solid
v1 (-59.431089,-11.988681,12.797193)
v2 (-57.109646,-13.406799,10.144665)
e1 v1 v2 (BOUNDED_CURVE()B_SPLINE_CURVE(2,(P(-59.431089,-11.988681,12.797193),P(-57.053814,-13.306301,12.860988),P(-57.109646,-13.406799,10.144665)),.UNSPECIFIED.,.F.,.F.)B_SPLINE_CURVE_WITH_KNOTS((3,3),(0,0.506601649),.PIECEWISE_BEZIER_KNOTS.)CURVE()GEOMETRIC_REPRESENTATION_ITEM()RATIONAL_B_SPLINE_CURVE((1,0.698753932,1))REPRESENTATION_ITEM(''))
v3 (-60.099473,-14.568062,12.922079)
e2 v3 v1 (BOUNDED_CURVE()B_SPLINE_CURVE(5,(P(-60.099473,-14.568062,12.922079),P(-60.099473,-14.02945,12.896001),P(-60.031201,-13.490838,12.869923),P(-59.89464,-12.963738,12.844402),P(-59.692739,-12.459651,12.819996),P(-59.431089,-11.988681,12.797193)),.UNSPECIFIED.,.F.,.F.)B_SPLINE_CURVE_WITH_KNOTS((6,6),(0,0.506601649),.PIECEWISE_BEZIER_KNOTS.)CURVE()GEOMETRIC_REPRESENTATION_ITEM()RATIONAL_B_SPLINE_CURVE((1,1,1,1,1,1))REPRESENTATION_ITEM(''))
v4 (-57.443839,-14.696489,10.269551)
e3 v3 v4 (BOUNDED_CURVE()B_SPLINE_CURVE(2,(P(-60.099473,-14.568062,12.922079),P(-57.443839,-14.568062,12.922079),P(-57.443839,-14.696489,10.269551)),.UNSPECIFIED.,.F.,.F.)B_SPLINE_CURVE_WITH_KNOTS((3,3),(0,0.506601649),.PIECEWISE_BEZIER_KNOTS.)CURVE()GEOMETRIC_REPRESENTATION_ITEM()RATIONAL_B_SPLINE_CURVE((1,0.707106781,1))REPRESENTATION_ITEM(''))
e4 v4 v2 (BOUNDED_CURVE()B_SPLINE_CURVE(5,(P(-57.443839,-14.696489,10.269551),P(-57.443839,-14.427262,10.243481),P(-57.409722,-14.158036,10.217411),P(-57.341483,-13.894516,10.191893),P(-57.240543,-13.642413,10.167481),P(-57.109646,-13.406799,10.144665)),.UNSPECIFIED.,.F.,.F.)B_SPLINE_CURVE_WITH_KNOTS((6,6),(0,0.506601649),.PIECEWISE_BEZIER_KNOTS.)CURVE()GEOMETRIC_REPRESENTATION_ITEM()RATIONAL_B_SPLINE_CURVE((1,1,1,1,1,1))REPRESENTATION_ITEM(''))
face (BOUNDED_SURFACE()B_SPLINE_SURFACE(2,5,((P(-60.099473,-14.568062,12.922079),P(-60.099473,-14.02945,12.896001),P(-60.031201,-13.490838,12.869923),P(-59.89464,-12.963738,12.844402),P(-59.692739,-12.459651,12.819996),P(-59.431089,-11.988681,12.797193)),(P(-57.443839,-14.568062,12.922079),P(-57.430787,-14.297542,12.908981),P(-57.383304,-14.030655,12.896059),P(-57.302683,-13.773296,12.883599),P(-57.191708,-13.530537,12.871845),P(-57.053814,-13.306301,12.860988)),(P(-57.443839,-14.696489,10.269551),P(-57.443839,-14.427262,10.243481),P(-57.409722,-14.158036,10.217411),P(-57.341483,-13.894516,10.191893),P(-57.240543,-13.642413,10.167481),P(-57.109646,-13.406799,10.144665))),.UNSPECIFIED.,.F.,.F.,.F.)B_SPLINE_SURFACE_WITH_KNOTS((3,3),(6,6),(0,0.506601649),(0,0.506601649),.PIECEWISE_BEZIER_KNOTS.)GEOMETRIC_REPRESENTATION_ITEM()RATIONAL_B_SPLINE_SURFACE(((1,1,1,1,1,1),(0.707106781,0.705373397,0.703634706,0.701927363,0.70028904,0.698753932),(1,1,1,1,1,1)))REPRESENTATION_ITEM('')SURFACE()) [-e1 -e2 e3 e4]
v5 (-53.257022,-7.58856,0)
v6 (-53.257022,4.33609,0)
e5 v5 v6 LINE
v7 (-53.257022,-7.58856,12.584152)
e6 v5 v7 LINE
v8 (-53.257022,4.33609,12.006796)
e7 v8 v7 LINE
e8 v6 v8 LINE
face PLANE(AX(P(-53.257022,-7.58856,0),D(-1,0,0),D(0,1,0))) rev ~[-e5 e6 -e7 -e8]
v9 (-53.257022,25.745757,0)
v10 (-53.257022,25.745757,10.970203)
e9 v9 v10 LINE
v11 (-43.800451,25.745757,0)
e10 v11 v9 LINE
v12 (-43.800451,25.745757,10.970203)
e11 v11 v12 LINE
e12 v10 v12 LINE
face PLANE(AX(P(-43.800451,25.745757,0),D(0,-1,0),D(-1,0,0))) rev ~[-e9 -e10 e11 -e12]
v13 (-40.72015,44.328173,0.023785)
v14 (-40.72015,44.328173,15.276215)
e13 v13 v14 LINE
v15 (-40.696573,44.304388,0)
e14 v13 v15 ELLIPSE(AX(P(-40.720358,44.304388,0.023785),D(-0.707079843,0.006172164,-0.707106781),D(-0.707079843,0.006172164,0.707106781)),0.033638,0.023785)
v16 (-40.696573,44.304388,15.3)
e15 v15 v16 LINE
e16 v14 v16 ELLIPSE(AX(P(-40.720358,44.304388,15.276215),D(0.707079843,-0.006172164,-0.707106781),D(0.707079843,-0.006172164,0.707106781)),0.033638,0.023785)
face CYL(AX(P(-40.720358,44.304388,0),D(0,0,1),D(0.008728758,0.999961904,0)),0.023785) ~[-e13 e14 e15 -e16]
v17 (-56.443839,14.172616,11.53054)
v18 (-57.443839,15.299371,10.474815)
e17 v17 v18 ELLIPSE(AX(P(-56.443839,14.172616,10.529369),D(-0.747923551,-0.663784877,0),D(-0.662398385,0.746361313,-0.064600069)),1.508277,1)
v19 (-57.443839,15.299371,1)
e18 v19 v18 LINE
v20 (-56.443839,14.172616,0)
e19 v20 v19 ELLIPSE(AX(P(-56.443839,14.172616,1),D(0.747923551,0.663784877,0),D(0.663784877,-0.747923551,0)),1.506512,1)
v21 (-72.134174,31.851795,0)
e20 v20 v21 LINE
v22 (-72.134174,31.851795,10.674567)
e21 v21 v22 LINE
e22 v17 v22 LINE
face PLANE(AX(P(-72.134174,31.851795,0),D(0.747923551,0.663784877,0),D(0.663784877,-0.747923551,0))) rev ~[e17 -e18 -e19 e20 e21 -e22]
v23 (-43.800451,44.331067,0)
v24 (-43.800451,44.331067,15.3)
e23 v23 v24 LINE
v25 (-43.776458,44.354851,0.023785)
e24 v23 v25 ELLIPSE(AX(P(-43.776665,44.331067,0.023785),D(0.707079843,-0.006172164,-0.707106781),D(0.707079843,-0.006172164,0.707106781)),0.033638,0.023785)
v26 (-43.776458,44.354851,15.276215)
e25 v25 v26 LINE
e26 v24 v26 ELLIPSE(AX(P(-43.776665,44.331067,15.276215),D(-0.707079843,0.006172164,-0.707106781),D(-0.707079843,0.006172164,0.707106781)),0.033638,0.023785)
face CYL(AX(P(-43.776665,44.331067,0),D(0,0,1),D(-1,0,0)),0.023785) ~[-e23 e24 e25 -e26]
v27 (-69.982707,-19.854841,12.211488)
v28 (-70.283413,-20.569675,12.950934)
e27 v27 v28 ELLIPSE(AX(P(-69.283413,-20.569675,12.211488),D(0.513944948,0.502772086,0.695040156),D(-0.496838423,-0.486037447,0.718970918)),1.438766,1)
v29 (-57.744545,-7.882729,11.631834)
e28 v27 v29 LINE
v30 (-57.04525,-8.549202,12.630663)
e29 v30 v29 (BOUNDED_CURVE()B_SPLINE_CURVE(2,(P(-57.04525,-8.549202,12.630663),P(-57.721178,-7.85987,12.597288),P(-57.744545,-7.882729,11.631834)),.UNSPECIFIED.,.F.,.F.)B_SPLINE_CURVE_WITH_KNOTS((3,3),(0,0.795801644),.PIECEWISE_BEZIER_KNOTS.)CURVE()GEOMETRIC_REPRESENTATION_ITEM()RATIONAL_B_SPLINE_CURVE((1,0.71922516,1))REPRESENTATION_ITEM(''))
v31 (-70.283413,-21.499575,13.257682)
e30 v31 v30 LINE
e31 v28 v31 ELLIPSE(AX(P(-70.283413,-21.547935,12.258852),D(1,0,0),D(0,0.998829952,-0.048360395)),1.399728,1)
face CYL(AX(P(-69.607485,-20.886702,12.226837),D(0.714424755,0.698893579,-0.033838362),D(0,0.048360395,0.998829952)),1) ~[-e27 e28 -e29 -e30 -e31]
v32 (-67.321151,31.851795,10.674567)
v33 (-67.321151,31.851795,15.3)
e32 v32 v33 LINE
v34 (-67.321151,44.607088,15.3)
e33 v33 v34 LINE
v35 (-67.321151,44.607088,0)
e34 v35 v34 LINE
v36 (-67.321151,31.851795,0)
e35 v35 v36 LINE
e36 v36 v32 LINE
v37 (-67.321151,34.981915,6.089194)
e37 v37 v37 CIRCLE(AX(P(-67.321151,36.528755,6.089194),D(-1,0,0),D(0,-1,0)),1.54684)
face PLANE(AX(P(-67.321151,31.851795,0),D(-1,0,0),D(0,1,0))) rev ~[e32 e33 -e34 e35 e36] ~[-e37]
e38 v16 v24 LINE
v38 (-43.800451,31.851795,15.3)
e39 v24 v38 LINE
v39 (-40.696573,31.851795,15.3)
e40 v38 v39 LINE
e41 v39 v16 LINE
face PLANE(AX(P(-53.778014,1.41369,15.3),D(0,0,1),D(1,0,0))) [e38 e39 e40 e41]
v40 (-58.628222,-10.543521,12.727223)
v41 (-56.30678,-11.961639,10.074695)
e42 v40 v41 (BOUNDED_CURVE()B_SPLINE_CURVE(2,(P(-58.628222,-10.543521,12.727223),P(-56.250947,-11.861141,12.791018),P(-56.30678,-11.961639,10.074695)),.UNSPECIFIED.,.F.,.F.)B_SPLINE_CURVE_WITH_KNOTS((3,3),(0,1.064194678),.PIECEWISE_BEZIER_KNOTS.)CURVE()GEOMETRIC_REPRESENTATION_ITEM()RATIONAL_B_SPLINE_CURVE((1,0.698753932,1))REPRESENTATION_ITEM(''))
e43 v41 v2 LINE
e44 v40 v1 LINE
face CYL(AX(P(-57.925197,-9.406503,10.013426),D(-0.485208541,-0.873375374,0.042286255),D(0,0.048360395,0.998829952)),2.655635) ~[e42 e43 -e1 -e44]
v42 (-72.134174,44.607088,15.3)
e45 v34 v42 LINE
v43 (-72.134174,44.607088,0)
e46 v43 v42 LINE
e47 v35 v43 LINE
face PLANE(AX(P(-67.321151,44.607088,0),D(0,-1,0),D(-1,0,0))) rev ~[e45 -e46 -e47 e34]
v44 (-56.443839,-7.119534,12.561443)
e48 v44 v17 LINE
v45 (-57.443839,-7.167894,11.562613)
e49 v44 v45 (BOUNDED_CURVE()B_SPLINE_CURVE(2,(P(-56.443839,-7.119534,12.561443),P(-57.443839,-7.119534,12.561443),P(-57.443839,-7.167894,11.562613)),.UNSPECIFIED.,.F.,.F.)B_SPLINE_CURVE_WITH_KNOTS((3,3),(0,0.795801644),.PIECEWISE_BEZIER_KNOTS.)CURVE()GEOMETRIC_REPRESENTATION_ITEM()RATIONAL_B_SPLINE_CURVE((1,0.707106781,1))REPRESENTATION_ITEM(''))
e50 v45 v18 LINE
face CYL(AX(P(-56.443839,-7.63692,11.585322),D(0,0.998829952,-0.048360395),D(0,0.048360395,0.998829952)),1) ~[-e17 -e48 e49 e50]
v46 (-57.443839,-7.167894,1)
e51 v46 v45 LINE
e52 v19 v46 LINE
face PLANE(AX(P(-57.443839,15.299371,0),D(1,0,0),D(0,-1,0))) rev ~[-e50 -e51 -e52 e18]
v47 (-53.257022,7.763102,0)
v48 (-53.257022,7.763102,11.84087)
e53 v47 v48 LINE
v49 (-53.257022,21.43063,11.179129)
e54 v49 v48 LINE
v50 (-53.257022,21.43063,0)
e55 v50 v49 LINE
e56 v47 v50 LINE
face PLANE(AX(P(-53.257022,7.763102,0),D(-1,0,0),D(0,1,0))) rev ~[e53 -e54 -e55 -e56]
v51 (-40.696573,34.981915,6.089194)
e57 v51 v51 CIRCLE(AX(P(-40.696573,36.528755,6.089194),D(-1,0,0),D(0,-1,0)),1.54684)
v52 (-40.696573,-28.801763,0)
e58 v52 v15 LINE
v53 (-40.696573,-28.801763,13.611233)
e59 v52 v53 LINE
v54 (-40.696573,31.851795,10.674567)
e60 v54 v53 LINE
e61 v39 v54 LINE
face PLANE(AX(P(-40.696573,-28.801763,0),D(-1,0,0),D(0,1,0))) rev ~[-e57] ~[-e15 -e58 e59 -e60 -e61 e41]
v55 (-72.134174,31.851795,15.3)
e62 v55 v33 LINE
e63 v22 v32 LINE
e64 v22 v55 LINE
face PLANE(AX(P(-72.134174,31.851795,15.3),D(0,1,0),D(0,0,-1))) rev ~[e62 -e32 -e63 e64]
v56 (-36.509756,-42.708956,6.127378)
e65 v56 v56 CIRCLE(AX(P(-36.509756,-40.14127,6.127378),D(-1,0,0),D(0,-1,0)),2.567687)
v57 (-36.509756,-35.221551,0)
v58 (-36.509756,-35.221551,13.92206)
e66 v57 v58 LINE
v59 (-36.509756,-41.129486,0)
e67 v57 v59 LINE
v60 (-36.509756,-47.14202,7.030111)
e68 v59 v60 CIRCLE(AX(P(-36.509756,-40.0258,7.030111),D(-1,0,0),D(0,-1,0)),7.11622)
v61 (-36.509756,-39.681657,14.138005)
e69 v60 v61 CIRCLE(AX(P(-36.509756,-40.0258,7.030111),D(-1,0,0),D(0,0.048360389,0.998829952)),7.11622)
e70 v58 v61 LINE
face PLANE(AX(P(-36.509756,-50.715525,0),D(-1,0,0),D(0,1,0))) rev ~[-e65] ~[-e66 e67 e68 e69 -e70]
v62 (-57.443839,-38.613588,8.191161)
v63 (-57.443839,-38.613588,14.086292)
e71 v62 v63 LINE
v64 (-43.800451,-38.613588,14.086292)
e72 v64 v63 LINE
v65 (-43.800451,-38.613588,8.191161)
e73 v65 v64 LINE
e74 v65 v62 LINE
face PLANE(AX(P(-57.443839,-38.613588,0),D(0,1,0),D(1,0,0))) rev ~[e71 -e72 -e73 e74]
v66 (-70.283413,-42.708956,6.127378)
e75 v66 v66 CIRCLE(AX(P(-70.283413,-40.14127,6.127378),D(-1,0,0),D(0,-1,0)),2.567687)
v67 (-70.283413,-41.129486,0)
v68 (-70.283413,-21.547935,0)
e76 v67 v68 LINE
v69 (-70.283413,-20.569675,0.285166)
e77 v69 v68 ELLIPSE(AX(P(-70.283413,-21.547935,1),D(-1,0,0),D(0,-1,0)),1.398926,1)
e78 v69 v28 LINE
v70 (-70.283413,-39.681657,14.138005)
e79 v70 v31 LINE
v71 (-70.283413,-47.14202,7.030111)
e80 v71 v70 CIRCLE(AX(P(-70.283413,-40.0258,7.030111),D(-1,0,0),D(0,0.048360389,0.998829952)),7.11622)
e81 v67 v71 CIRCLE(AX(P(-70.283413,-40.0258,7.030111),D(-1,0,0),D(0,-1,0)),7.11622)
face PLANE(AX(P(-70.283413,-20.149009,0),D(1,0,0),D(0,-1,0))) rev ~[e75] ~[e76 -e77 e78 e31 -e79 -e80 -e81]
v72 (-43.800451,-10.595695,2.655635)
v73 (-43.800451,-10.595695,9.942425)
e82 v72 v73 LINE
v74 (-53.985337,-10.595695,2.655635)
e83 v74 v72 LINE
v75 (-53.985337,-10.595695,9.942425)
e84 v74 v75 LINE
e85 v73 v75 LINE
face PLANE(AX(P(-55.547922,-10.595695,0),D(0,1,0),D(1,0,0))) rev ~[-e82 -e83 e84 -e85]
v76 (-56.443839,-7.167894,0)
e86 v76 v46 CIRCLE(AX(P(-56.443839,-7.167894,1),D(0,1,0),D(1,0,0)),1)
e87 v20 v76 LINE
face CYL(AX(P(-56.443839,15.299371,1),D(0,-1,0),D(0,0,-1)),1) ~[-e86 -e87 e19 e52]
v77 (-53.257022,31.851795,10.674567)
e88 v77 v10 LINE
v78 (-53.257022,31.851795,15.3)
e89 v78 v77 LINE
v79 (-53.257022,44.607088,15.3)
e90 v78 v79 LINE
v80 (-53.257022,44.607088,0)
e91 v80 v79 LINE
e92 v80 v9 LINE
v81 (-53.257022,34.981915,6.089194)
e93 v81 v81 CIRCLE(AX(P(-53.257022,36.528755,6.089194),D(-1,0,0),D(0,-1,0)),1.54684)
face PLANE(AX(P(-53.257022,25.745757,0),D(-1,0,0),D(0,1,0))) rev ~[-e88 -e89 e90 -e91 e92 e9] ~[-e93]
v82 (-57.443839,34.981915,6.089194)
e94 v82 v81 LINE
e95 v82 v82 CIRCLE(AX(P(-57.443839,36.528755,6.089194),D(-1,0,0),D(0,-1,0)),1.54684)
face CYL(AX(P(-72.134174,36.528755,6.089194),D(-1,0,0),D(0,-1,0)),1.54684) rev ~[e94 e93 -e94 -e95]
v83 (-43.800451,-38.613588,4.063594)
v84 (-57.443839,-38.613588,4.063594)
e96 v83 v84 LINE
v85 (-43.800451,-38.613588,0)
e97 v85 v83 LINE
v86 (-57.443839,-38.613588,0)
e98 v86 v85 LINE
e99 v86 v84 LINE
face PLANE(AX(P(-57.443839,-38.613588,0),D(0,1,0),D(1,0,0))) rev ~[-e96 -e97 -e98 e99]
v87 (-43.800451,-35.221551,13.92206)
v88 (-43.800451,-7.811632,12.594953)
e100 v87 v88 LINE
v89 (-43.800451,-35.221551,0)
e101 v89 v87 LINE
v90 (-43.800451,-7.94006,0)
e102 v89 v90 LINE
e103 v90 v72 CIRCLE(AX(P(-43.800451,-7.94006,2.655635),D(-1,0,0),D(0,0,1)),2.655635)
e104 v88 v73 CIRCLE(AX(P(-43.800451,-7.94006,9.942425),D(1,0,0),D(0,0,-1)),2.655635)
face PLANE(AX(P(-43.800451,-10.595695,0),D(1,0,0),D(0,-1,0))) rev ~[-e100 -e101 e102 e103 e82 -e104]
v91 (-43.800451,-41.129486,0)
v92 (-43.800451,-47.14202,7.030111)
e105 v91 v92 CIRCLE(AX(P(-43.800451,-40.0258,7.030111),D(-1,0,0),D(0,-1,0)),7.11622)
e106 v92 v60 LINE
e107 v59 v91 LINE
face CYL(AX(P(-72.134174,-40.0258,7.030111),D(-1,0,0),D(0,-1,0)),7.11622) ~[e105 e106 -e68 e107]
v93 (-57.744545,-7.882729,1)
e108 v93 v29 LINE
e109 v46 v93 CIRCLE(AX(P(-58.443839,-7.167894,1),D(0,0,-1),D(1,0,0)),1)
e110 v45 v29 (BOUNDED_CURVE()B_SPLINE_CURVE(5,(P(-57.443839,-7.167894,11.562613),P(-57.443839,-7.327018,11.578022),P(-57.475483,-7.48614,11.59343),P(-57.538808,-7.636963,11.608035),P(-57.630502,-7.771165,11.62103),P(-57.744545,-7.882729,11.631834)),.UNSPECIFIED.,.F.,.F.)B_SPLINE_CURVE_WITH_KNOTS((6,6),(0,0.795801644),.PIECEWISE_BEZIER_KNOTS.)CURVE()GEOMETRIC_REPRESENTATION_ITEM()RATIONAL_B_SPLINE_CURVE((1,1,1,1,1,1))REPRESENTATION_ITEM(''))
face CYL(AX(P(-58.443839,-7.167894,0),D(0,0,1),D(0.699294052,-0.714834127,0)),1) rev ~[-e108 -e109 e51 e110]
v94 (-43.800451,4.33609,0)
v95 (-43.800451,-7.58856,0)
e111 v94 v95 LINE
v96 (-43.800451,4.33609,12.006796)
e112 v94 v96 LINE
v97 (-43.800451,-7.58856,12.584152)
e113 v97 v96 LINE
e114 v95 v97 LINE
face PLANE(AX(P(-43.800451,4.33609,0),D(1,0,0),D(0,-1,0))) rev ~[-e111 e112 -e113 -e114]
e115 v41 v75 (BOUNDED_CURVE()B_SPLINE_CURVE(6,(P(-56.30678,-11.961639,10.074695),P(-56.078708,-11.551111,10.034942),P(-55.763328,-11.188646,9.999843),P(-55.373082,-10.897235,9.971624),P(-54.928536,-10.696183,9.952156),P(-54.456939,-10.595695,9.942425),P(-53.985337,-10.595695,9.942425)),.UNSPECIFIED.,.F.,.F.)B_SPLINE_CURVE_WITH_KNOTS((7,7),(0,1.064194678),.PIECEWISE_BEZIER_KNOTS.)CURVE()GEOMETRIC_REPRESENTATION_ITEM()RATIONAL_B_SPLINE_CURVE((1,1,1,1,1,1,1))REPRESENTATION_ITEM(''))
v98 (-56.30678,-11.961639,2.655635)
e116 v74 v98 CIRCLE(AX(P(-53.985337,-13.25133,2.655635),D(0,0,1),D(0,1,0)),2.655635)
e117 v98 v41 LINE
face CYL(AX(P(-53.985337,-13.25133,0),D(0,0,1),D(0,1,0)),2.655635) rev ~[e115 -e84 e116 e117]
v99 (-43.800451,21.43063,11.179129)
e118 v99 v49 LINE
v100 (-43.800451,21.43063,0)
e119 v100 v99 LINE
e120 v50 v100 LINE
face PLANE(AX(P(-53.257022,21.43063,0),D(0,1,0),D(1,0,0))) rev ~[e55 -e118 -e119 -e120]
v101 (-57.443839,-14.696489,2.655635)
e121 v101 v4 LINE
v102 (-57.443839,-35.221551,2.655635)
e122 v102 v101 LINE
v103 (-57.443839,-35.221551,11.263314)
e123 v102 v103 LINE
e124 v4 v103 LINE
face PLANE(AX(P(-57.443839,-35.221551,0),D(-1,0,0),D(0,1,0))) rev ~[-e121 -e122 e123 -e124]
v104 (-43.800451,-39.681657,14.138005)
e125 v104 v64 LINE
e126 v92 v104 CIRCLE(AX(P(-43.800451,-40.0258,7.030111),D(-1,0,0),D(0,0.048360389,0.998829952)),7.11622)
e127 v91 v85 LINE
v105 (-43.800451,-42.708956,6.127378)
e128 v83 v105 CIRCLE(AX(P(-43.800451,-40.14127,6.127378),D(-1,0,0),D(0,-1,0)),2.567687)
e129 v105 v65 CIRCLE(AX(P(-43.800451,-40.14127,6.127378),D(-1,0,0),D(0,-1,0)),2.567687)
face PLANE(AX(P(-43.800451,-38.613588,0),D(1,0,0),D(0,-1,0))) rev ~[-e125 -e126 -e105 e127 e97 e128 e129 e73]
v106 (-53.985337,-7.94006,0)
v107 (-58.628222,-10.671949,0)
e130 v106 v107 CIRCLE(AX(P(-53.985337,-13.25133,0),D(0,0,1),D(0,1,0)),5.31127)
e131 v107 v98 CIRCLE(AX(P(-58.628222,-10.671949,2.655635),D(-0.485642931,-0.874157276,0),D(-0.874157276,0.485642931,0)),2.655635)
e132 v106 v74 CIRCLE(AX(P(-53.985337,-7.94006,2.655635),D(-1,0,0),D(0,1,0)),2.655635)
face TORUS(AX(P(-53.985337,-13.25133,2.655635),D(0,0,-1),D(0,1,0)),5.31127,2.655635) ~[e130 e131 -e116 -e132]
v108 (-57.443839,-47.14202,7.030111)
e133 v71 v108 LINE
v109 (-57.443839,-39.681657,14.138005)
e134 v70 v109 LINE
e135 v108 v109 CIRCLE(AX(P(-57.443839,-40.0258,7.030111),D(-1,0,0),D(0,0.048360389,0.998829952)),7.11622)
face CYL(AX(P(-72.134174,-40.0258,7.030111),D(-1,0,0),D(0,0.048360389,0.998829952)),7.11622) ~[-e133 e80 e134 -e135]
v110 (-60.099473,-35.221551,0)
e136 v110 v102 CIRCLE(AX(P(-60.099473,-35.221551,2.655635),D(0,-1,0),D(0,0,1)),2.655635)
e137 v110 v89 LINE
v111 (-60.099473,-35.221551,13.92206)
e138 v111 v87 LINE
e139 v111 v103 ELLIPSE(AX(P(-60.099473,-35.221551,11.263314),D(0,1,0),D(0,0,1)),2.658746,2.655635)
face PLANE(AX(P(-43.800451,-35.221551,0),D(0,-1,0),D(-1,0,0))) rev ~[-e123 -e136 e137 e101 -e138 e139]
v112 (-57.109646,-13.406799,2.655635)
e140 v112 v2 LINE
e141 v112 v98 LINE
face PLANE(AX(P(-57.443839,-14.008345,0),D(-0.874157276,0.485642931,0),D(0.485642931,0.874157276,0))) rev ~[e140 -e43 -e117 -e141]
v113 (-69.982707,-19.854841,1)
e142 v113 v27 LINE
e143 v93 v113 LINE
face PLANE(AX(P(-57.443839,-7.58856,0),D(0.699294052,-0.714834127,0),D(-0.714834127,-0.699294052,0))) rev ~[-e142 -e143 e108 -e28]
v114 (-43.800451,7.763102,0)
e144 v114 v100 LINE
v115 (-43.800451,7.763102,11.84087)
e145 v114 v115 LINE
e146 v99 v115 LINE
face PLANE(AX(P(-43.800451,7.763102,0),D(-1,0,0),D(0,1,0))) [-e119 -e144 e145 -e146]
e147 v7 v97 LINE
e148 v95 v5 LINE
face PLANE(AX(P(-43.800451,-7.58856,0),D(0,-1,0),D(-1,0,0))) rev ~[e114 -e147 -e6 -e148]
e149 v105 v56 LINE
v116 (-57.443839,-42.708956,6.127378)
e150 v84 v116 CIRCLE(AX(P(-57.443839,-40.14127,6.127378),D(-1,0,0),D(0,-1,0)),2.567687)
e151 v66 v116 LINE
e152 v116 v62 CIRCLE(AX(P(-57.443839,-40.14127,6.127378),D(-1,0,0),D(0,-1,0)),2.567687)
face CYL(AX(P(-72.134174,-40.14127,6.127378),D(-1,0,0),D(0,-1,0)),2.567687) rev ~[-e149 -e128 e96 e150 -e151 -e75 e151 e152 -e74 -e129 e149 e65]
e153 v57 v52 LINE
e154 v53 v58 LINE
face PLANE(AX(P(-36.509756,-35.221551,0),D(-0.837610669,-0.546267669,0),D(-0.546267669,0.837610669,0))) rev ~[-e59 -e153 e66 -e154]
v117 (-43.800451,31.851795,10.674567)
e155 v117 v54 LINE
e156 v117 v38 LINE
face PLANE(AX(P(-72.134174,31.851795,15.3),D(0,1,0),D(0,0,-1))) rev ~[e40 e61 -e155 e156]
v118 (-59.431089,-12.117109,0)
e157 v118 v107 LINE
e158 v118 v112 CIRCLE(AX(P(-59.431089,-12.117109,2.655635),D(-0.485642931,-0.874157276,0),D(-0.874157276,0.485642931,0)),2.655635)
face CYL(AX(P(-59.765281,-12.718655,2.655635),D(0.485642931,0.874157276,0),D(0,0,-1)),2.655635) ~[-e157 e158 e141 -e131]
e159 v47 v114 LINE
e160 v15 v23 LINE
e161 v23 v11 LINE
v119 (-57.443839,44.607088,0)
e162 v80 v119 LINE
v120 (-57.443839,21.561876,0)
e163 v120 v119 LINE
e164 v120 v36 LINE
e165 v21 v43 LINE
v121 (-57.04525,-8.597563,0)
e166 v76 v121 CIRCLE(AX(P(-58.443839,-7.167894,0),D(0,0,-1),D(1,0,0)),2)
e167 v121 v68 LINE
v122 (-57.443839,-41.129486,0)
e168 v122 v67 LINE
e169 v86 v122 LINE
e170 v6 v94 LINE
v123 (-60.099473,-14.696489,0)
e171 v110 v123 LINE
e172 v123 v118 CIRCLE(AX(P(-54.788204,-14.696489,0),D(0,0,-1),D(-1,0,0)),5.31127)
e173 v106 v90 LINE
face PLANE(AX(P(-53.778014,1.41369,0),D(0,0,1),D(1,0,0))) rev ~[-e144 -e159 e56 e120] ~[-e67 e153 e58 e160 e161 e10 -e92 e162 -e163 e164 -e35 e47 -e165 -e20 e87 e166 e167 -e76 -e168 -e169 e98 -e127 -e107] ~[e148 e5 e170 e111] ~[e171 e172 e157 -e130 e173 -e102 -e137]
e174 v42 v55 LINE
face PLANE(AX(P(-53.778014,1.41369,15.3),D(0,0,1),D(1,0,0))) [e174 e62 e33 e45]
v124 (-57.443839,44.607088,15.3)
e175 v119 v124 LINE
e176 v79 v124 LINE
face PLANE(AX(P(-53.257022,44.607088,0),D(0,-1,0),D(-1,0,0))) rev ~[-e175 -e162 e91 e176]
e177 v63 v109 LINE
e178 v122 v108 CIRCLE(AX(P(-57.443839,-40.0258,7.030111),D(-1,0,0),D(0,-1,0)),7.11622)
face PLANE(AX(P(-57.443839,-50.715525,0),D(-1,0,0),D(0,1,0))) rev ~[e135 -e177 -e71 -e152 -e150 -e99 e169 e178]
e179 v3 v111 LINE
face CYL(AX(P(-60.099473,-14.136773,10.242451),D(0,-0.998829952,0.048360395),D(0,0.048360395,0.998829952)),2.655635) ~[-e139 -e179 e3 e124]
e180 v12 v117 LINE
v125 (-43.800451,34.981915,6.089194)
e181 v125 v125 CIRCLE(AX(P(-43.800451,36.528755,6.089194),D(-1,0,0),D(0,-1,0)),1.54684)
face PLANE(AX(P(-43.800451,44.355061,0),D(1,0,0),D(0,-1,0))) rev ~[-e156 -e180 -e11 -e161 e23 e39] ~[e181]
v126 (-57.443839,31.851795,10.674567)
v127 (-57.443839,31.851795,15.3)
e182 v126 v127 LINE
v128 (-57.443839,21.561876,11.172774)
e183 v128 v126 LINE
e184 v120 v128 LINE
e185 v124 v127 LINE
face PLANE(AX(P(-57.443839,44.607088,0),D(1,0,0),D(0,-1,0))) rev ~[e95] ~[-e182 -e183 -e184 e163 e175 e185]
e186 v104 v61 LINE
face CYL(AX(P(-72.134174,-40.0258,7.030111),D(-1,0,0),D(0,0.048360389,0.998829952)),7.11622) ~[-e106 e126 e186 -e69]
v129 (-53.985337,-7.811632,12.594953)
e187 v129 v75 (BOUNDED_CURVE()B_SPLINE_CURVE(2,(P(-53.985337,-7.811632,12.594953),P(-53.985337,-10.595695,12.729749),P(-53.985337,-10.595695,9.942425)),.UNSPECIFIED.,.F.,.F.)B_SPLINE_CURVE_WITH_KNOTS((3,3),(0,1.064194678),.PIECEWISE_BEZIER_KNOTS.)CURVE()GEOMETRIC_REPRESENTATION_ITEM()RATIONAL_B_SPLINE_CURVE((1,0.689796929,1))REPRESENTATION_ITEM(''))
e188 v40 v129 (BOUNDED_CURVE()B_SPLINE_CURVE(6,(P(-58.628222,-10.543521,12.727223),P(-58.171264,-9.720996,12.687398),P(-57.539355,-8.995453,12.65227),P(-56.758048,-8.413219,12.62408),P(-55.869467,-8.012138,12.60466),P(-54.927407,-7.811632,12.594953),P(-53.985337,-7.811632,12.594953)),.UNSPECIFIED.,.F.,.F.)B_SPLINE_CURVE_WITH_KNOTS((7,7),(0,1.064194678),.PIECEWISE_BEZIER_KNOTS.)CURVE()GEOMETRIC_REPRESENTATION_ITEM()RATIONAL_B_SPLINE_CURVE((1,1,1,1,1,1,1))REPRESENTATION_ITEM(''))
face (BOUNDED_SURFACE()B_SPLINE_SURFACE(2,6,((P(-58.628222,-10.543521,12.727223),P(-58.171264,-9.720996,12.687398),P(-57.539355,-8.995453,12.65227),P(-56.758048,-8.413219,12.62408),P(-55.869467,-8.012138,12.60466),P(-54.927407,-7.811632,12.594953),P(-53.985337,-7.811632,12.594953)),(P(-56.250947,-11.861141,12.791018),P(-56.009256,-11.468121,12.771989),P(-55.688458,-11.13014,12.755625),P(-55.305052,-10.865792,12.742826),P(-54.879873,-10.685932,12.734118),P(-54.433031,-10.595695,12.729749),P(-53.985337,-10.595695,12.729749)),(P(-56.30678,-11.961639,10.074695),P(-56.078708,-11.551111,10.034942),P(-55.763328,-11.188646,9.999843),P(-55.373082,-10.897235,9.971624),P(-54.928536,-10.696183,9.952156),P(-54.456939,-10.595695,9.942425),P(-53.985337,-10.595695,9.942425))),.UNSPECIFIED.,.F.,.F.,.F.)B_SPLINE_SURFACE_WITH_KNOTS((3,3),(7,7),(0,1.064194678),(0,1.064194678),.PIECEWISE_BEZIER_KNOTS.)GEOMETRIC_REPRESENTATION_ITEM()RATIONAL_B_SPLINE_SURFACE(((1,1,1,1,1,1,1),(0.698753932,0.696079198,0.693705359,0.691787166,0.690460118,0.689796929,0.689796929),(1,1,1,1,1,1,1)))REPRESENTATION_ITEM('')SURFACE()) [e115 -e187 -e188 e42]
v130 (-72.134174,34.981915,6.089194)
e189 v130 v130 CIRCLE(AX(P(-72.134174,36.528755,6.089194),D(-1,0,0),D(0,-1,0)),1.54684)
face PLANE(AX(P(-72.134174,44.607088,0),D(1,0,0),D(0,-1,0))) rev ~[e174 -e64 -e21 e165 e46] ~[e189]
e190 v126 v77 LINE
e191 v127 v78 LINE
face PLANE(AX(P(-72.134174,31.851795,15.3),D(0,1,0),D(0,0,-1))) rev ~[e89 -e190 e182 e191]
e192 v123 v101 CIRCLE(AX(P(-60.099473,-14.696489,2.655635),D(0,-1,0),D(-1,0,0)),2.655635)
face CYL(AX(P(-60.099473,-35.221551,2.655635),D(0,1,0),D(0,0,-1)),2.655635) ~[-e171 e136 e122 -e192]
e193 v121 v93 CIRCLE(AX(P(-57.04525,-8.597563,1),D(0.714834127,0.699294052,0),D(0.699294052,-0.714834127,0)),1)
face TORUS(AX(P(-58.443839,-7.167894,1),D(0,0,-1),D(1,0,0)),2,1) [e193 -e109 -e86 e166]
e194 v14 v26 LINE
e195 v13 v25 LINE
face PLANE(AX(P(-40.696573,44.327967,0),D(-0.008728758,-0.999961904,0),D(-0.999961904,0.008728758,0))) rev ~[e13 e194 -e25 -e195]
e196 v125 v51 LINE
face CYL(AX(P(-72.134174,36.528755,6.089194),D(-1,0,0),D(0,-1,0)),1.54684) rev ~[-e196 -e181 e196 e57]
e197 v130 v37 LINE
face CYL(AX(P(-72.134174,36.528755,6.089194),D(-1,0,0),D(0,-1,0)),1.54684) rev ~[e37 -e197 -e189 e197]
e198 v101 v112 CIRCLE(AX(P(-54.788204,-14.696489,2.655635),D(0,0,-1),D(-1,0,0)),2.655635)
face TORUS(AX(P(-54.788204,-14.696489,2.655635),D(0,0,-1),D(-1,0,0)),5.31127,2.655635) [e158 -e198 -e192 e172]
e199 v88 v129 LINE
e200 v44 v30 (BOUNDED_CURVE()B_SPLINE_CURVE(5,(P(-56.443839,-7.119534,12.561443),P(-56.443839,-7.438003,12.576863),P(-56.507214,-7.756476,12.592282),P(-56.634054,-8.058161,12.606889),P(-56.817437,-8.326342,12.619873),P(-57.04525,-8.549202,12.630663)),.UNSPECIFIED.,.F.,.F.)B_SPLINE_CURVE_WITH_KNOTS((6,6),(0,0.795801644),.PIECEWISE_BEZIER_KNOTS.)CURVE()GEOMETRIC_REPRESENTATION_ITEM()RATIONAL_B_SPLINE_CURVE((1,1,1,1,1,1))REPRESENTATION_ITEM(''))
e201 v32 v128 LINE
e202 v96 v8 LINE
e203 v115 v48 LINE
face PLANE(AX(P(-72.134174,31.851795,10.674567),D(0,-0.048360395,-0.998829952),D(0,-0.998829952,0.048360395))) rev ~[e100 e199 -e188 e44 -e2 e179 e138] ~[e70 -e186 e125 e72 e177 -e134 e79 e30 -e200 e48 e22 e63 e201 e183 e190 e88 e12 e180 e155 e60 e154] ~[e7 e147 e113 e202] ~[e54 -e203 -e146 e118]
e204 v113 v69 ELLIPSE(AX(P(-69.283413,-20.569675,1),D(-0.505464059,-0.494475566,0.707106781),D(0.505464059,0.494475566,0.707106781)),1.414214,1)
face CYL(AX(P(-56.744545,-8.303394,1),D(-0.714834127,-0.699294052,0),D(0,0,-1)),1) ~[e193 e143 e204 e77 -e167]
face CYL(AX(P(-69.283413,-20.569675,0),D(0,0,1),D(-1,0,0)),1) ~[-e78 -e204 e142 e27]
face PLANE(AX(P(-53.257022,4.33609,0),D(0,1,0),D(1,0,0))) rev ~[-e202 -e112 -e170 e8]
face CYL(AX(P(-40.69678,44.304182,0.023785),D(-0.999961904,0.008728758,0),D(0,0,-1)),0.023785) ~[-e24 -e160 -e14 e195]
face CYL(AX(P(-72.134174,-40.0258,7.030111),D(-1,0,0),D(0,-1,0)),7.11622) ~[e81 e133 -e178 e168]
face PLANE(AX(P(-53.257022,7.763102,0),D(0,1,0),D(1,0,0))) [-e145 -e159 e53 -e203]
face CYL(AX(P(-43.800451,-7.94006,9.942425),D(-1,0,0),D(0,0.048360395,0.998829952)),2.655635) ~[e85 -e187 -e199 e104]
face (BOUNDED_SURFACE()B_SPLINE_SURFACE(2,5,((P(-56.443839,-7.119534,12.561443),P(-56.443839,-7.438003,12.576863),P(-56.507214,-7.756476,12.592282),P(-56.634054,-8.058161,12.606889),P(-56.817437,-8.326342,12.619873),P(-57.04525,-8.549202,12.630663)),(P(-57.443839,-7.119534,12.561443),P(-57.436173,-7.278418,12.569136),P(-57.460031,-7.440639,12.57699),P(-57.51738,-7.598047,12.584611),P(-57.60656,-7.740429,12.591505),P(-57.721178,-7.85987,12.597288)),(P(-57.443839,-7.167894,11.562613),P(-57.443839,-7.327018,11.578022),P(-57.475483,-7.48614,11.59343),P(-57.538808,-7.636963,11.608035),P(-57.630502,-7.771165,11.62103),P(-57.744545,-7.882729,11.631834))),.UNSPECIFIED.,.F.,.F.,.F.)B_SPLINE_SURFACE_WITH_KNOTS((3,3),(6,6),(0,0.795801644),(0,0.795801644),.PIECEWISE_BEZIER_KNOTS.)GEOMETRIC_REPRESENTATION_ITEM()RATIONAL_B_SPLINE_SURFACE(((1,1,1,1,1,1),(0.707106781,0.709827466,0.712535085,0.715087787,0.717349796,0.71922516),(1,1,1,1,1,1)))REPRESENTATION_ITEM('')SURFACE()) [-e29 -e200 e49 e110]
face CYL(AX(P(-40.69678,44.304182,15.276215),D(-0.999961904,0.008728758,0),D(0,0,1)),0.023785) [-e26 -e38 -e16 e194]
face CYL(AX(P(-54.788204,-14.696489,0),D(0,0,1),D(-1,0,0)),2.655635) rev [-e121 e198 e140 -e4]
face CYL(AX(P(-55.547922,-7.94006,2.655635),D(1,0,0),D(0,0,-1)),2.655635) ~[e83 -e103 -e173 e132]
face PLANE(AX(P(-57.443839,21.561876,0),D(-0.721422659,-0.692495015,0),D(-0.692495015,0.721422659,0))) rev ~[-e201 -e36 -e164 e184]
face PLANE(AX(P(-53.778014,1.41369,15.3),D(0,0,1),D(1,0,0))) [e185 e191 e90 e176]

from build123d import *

# Parameters (mm, degrees)
F0_W     = 9.4565711915
F0_H     = 13.6675285175
F1_DEPTH = 15.3
F2_W     = 109.1410517693
F2_H     = 22.5323475897
F3_DEPTH = 77
F4_R     = 2.5676865252
F5_DEPTH = 65.4
F6_R     = 1.5468397632
F7_DEPTH = 54.6
F8_R     = 2.6556349186
F9_R     = 1
F10_R    = 0.0237853743


with BuildPart() as f1:
    # F0 (on Top) → F1 (new body)
    with BuildSketch(Plane.XY):
        Polygon((-40.6965725124, 44.3279668689), (-43.8004508615, 44.3550609052), (-43.8004508615, 25.7457569242), (-53.257022053, 25.7457569242), (-53.257022053, 44.6070879698), (-57.4438385665, 44.6070879698), (-57.4438385665, 21.5618759394), (-67.321151495, 31.8517945707), (-67.321151495, 44.6070879698), (-72.1341744065, 44.6070879698), (-72.1341744065, 31.8517945707), (-57.4438385665, 15.2993714437), (-57.4438385665, -7.5885597616), (-70.2834129333, -20.1490093023), (-70.2834129333, -50.7155247033), (-57.4438385665, -50.7155247033), (-57.4438385665, -38.6135876179), (-43.8004508615, -38.6135876179), (-43.8004508615, -50.7155247033), (-36.5097559988, -50.7155247033), (-36.5097559988, -35.2215506136), (-40.6965725124, -28.8017634302), align=None)
        Polygon((-43.8004508615, -10.5956946412), (-43.8004508615, -35.2215506136), (-57.4438385665, -35.2215506136), (-57.4438385665, -14.0083450824), (-55.5479216548, -10.5956946412), align=None, mode=Mode.SUBTRACT)
        Polygon((-49.6741862581, -7.5885597616), (-53.257022053, -7.5885597616), (-53.257022053, 4.3360902928), (-49.6741862581, 4.3360902928), (-43.8004508615, 4.3360902928), (-43.8004508615, -7.5885597616), align=None, mode=Mode.SUBTRACT)
        with Locations((-48.5287364572, 14.5968659781)):
            Rectangle(F0_W, F0_H, mode=Mode.SUBTRACT)
    extrude(amount=F1_DEPTH)

    # F2 (on face) → F3 (cut)
    with BuildSketch(Plane(origin=(-72.1341744065, 0, 0), x_dir=(0, -1, 0), z_dir=(-1, 0, 0))):
        with Locations((3.7736594677, 6.6085606813)):
            Rectangle(F2_W, F2_H)
        with BuildLine():
            ThreePointArc((39.6816573, 14.1380049634), (44.9345471885, 12.1822751735), (47.1420204778, 7.0301112719))
            ThreePointArc((47.1420204778, 7.0301112719), (44.6510850499, 1.622031227), (38.9221144813, 0))
            Line((38.9221144813, 0), (-31.8517945707, 0))
            Line((-31.8517945707, 0), (-37.1405081916, 0))
            ThreePointArc((-37.1405081916, 0), (-38.2294412702, -0.1143932508), (-39.3183743488, 0))
            Line((-39.3183743488, 0), (-44.6070879698, 0))
            Line((-44.6070879698, 0), (-44.6070879698, 15.3))
            Line((-44.6070879698, 15.3), (-31.8517945707, 15.3))
            Line((-31.8517945707, 15.3), (-31.8517945707, 10.6745666141))
            Line((-31.8517945707, 10.6745666141), (39.6816573, 14.1380049634))
        make_face(mode=Mode.SUBTRACT)
    extrude(amount=-F3_DEPTH, mode=Mode.SUBTRACT)

    # F4 (on face) → F5 (cut)
    with BuildSketch(Plane(origin=(-72.1341744065, 0, 0), x_dir=(0, -1, 0), z_dir=(-1, 0, 0))):
        with Locations((40.1412695646, 6.1273775063)):
            Circle(F4_R)
    extrude(amount=-F5_DEPTH, mode=Mode.SUBTRACT)

    # F6 (on face) → F7 (cut)
    with BuildSketch(Plane(origin=(-72.1341744065, 0, 0), x_dir=(0, -1, 0), z_dir=(-1, 0, 0))):
        with Locations((-36.5287549794, 6.0891942121)):
            Circle(F6_R)
    extrude(amount=-F7_DEPTH, mode=Mode.SUBTRACT)

    # F8
    f8_edges = [f1.edges().sort_by_distance(p)[0] for p in [
        (-56.49588, -12.30202, 0),
        (-55.547922, -10.595695, 6.364874),
        (-56.49588, -12.30202, 12.812364),
        (-57.443839, -14.008345, 6.44749),
        (-49.674186, -10.595695, 0),
        (-57.443839, -24.614948, 0),
        (-49.674186, -10.595695, 12.729749),
        (-57.443839, -24.614948, 13.408519),
    ]]
    fillet(f8_edges, radius=F8_R)

    # F9
    f9_edges = [f1.edges().sort_by_distance(p)[0] for p in [
        (-63.863626, -13.868785, 0),
        (-70.283413, -20.149009, 6.596146),
        (-63.863626, -13.868785, 12.888222),
        (-57.443839, -7.58856, 6.292076),
        (-57.443839, 3.855406, 0),
        (-57.443839, 3.855406, 12.030069),
    ]]
    fillet(f9_edges, radius=F9_R)

    # F10
    f10_edges = [f1.edges().sort_by_distance(p)[0] for p in [
        (-40.696573, 44.327967, 7.65),
        (-43.800451, 44.355061, 7.65),
        (-42.248512, 44.341514, 0),
        (-42.248512, 44.341514, 15.3),
    ]]
    fillet(f10_edges, radius=F10_R)


solid = f1.part
